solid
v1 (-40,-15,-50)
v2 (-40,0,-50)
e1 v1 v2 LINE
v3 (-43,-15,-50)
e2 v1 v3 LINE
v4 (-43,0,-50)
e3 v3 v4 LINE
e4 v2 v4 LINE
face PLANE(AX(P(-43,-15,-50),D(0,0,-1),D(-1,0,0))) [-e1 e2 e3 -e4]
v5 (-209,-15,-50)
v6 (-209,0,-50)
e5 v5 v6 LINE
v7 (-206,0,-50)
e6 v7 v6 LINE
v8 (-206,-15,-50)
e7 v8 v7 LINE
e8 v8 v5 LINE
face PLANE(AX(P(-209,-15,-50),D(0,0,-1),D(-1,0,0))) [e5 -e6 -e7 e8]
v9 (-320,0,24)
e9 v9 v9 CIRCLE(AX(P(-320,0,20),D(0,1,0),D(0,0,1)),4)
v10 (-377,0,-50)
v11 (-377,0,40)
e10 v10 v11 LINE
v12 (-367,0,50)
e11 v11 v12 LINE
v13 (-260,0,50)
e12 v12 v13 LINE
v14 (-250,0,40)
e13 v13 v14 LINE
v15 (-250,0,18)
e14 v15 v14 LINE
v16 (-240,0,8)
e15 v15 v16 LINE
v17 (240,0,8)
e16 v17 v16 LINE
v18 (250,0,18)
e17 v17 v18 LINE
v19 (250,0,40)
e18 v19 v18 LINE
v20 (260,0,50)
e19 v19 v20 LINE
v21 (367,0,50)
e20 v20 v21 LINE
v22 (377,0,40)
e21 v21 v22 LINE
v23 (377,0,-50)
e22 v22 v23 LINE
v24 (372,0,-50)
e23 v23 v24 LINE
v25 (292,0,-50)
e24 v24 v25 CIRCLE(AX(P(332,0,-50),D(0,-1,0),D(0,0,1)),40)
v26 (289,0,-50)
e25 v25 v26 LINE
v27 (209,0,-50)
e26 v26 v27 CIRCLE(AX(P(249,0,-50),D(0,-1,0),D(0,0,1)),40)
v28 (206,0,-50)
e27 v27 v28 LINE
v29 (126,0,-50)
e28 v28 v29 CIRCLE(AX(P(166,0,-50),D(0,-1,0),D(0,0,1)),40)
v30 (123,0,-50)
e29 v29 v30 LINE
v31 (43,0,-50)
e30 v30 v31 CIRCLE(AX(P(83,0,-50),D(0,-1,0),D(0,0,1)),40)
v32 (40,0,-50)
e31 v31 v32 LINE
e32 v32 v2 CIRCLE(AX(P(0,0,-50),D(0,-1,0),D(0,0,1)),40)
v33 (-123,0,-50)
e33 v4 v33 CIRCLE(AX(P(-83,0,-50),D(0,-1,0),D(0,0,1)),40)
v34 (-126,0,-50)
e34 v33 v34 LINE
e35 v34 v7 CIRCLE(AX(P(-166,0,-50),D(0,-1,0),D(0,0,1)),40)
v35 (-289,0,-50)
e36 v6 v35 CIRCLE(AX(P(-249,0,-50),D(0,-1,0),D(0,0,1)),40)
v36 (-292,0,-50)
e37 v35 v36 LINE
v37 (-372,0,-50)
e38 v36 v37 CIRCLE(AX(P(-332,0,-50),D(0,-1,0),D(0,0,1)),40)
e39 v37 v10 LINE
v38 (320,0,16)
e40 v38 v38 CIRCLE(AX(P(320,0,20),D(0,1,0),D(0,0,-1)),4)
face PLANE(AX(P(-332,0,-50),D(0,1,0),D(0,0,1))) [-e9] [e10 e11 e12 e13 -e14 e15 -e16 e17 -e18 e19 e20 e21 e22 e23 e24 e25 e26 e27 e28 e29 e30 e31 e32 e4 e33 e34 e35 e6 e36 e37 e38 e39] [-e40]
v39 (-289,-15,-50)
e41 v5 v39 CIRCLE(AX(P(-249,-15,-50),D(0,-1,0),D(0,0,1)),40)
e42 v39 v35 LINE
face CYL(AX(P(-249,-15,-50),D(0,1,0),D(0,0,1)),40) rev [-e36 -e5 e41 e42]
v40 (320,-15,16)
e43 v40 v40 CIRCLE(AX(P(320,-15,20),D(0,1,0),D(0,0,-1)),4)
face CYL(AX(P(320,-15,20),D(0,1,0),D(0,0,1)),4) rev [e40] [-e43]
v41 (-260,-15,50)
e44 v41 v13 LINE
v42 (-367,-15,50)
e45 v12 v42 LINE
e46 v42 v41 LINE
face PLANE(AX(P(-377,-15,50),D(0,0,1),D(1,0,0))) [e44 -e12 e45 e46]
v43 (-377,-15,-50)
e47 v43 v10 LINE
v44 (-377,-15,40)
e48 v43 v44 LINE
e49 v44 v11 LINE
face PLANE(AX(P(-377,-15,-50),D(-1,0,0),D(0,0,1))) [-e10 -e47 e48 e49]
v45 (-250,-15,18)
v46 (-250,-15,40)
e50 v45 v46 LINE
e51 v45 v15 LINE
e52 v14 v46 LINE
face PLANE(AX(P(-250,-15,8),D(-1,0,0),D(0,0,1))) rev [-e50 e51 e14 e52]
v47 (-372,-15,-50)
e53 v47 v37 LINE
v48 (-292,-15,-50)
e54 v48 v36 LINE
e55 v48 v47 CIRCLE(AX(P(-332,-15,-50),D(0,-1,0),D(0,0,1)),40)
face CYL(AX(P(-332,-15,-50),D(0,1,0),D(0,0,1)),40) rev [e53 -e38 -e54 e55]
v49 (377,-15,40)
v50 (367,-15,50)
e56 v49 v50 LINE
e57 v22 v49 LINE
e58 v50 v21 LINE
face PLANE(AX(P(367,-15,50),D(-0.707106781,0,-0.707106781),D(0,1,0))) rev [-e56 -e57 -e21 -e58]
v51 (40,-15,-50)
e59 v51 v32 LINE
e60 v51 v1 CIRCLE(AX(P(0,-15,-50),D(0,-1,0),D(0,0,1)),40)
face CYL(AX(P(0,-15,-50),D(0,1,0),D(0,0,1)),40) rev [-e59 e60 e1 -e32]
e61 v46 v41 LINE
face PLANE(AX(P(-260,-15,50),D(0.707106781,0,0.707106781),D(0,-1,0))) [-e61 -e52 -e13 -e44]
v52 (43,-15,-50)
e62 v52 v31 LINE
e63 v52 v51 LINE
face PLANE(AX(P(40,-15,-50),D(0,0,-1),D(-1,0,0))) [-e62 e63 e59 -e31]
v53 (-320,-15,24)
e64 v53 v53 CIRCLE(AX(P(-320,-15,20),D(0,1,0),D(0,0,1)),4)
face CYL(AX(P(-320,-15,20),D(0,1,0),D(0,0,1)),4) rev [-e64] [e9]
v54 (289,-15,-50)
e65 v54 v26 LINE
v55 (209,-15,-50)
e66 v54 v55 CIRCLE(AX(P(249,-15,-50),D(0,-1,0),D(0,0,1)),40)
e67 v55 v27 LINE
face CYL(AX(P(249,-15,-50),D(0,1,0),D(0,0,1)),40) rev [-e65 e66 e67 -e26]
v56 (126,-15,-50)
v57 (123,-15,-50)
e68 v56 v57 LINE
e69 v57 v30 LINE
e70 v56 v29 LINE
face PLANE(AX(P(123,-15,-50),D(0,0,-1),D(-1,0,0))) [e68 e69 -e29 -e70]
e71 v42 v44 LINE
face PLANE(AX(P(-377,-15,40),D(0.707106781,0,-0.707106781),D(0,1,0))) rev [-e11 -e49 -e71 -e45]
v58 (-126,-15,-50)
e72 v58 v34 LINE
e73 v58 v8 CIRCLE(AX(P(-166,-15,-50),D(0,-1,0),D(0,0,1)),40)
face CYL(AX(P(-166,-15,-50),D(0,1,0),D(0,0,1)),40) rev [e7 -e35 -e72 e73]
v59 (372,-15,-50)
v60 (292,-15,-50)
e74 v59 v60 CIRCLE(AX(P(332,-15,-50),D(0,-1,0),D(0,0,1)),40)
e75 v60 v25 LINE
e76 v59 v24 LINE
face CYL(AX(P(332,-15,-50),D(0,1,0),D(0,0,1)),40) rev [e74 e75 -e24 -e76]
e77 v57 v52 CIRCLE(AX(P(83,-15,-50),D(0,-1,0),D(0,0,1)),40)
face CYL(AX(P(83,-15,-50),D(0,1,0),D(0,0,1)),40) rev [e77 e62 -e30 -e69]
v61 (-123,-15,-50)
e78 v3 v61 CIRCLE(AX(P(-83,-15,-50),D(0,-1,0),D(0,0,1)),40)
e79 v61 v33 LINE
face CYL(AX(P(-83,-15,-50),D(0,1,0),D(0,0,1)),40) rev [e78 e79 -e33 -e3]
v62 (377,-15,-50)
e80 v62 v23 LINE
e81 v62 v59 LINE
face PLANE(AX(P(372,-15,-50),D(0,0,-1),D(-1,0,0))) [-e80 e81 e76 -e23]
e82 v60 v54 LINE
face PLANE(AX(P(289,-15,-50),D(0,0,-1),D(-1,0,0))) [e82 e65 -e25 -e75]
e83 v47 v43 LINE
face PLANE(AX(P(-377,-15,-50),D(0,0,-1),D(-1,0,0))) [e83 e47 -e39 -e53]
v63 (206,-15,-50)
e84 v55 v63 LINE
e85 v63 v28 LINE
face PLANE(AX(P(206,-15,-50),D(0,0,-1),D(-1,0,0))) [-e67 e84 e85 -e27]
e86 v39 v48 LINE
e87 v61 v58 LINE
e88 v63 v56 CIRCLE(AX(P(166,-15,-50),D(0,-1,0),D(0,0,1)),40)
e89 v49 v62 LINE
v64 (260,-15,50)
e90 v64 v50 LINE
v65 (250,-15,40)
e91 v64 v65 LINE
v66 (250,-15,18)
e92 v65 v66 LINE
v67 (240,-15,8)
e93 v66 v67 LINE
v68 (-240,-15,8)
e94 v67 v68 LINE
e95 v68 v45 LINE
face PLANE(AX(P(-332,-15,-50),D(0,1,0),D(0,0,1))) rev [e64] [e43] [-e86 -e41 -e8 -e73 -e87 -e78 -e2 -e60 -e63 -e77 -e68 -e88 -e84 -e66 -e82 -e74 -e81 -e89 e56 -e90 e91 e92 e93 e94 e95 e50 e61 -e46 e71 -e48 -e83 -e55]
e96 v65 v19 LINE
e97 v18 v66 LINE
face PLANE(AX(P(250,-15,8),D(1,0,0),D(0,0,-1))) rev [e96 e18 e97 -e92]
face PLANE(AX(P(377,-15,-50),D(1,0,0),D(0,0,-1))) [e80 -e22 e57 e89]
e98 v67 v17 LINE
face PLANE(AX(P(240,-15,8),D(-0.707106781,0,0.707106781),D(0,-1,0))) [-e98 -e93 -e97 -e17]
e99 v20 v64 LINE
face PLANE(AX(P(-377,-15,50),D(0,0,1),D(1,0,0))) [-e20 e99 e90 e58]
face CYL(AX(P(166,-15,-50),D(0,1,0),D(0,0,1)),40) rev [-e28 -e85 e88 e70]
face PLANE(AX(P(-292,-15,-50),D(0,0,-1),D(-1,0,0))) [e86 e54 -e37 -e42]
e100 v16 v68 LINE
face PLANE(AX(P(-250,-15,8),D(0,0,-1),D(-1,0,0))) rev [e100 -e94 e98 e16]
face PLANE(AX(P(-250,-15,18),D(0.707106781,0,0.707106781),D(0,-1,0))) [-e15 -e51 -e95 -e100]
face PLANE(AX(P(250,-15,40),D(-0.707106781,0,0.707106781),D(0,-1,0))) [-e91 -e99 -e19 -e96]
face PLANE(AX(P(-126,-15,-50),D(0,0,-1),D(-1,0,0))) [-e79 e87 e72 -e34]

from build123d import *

# Parameters (mm, degrees)
SKETCH1_R          = 4
BASE_FLANGE1_DEPTH = 15
SKETCH6_W          = 500
SKETCH6_H          = 42
CUT_EXTRUDE1_DEPTH = 381.59689962
CHAMFER1_SIZE      = 10


# Sheet-metal steps are written as plain solids
with BuildPart() as part:
    # Sketch1 → Base-Flange1 (new body)
    with BuildSketch(Plane(origin=(0, 0, 0), x_dir=(1, 0, 0), z_dir=(0, 1, 0))):
        with BuildLine():
            Line((372, 50), (377, 50))
            Line((377, 50), (377, -50))
            Line((377, -50), (-377, -50))
            Line((-377, -50), (-377, 50))
            Line((-377, 50), (-372, 50))
            ThreePointArc((-372, 50), (-332, 10), (-292, 50))
            Line((-292, 50), (-289, 50))
            ThreePointArc((-289, 50), (-249, 10), (-209, 50))
            Line((-209, 50), (-206, 50))
            ThreePointArc((-206, 50), (-166, 10), (-126, 50))
            Line((-126, 50), (-123, 50))
            ThreePointArc((-123, 50), (-83, 10), (-43, 50))
            Line((-43, 50), (-40, 50))
            ThreePointArc((-40, 50), (0, 10), (40, 50))
            Line((40, 50), (43, 50))
            ThreePointArc((43, 50), (83, 10), (123, 50))
            Line((123, 50), (126, 50))
            ThreePointArc((126, 50), (166, 10), (206, 50))
            Line((206, 50), (209, 50))
            ThreePointArc((209, 50), (249, 10), (289, 50))
            Line((289, 50), (292, 50))
            ThreePointArc((292, 50), (332, 10), (372, 50))
        make_face()
        with Locations(Location((-320, -20, 0), (0, 0, 270))):
            Circle(SKETCH1_R, mode=Mode.SUBTRACT)
        with Locations(Location((320, -20, 0), (0, 0, 90))):
            Circle(SKETCH1_R, mode=Mode.SUBTRACT)
    extrude(amount=-BASE_FLANGE1_DEPTH)

    # Sketch6 → Cut-Extrude1 (cut, through all)
    with BuildSketch(Plane(origin=(0, 0, 0), x_dir=(1, 0, 0), z_dir=(0, 1, 0))):
        with Locations((0, -29)):
            Rectangle(SKETCH6_W, SKETCH6_H)
    extrude(amount=-CUT_EXTRUDE1_DEPTH, mode=Mode.SUBTRACT)

    # Chamfer1
    chamfer1_edges = [part.edges().sort_by_distance(p)[0] for p in [
        (377, -7.5, 50),
        (-377, -7.5, 50),
        (-250, -7.5, 50),
        (-250, -7.5, 8),
        (250, -7.5, 8),
        (250, -7.5, 50),
    ]]
    chamfer(chamfer1_edges, length=CHAMFER1_SIZE)


solid = part.part
